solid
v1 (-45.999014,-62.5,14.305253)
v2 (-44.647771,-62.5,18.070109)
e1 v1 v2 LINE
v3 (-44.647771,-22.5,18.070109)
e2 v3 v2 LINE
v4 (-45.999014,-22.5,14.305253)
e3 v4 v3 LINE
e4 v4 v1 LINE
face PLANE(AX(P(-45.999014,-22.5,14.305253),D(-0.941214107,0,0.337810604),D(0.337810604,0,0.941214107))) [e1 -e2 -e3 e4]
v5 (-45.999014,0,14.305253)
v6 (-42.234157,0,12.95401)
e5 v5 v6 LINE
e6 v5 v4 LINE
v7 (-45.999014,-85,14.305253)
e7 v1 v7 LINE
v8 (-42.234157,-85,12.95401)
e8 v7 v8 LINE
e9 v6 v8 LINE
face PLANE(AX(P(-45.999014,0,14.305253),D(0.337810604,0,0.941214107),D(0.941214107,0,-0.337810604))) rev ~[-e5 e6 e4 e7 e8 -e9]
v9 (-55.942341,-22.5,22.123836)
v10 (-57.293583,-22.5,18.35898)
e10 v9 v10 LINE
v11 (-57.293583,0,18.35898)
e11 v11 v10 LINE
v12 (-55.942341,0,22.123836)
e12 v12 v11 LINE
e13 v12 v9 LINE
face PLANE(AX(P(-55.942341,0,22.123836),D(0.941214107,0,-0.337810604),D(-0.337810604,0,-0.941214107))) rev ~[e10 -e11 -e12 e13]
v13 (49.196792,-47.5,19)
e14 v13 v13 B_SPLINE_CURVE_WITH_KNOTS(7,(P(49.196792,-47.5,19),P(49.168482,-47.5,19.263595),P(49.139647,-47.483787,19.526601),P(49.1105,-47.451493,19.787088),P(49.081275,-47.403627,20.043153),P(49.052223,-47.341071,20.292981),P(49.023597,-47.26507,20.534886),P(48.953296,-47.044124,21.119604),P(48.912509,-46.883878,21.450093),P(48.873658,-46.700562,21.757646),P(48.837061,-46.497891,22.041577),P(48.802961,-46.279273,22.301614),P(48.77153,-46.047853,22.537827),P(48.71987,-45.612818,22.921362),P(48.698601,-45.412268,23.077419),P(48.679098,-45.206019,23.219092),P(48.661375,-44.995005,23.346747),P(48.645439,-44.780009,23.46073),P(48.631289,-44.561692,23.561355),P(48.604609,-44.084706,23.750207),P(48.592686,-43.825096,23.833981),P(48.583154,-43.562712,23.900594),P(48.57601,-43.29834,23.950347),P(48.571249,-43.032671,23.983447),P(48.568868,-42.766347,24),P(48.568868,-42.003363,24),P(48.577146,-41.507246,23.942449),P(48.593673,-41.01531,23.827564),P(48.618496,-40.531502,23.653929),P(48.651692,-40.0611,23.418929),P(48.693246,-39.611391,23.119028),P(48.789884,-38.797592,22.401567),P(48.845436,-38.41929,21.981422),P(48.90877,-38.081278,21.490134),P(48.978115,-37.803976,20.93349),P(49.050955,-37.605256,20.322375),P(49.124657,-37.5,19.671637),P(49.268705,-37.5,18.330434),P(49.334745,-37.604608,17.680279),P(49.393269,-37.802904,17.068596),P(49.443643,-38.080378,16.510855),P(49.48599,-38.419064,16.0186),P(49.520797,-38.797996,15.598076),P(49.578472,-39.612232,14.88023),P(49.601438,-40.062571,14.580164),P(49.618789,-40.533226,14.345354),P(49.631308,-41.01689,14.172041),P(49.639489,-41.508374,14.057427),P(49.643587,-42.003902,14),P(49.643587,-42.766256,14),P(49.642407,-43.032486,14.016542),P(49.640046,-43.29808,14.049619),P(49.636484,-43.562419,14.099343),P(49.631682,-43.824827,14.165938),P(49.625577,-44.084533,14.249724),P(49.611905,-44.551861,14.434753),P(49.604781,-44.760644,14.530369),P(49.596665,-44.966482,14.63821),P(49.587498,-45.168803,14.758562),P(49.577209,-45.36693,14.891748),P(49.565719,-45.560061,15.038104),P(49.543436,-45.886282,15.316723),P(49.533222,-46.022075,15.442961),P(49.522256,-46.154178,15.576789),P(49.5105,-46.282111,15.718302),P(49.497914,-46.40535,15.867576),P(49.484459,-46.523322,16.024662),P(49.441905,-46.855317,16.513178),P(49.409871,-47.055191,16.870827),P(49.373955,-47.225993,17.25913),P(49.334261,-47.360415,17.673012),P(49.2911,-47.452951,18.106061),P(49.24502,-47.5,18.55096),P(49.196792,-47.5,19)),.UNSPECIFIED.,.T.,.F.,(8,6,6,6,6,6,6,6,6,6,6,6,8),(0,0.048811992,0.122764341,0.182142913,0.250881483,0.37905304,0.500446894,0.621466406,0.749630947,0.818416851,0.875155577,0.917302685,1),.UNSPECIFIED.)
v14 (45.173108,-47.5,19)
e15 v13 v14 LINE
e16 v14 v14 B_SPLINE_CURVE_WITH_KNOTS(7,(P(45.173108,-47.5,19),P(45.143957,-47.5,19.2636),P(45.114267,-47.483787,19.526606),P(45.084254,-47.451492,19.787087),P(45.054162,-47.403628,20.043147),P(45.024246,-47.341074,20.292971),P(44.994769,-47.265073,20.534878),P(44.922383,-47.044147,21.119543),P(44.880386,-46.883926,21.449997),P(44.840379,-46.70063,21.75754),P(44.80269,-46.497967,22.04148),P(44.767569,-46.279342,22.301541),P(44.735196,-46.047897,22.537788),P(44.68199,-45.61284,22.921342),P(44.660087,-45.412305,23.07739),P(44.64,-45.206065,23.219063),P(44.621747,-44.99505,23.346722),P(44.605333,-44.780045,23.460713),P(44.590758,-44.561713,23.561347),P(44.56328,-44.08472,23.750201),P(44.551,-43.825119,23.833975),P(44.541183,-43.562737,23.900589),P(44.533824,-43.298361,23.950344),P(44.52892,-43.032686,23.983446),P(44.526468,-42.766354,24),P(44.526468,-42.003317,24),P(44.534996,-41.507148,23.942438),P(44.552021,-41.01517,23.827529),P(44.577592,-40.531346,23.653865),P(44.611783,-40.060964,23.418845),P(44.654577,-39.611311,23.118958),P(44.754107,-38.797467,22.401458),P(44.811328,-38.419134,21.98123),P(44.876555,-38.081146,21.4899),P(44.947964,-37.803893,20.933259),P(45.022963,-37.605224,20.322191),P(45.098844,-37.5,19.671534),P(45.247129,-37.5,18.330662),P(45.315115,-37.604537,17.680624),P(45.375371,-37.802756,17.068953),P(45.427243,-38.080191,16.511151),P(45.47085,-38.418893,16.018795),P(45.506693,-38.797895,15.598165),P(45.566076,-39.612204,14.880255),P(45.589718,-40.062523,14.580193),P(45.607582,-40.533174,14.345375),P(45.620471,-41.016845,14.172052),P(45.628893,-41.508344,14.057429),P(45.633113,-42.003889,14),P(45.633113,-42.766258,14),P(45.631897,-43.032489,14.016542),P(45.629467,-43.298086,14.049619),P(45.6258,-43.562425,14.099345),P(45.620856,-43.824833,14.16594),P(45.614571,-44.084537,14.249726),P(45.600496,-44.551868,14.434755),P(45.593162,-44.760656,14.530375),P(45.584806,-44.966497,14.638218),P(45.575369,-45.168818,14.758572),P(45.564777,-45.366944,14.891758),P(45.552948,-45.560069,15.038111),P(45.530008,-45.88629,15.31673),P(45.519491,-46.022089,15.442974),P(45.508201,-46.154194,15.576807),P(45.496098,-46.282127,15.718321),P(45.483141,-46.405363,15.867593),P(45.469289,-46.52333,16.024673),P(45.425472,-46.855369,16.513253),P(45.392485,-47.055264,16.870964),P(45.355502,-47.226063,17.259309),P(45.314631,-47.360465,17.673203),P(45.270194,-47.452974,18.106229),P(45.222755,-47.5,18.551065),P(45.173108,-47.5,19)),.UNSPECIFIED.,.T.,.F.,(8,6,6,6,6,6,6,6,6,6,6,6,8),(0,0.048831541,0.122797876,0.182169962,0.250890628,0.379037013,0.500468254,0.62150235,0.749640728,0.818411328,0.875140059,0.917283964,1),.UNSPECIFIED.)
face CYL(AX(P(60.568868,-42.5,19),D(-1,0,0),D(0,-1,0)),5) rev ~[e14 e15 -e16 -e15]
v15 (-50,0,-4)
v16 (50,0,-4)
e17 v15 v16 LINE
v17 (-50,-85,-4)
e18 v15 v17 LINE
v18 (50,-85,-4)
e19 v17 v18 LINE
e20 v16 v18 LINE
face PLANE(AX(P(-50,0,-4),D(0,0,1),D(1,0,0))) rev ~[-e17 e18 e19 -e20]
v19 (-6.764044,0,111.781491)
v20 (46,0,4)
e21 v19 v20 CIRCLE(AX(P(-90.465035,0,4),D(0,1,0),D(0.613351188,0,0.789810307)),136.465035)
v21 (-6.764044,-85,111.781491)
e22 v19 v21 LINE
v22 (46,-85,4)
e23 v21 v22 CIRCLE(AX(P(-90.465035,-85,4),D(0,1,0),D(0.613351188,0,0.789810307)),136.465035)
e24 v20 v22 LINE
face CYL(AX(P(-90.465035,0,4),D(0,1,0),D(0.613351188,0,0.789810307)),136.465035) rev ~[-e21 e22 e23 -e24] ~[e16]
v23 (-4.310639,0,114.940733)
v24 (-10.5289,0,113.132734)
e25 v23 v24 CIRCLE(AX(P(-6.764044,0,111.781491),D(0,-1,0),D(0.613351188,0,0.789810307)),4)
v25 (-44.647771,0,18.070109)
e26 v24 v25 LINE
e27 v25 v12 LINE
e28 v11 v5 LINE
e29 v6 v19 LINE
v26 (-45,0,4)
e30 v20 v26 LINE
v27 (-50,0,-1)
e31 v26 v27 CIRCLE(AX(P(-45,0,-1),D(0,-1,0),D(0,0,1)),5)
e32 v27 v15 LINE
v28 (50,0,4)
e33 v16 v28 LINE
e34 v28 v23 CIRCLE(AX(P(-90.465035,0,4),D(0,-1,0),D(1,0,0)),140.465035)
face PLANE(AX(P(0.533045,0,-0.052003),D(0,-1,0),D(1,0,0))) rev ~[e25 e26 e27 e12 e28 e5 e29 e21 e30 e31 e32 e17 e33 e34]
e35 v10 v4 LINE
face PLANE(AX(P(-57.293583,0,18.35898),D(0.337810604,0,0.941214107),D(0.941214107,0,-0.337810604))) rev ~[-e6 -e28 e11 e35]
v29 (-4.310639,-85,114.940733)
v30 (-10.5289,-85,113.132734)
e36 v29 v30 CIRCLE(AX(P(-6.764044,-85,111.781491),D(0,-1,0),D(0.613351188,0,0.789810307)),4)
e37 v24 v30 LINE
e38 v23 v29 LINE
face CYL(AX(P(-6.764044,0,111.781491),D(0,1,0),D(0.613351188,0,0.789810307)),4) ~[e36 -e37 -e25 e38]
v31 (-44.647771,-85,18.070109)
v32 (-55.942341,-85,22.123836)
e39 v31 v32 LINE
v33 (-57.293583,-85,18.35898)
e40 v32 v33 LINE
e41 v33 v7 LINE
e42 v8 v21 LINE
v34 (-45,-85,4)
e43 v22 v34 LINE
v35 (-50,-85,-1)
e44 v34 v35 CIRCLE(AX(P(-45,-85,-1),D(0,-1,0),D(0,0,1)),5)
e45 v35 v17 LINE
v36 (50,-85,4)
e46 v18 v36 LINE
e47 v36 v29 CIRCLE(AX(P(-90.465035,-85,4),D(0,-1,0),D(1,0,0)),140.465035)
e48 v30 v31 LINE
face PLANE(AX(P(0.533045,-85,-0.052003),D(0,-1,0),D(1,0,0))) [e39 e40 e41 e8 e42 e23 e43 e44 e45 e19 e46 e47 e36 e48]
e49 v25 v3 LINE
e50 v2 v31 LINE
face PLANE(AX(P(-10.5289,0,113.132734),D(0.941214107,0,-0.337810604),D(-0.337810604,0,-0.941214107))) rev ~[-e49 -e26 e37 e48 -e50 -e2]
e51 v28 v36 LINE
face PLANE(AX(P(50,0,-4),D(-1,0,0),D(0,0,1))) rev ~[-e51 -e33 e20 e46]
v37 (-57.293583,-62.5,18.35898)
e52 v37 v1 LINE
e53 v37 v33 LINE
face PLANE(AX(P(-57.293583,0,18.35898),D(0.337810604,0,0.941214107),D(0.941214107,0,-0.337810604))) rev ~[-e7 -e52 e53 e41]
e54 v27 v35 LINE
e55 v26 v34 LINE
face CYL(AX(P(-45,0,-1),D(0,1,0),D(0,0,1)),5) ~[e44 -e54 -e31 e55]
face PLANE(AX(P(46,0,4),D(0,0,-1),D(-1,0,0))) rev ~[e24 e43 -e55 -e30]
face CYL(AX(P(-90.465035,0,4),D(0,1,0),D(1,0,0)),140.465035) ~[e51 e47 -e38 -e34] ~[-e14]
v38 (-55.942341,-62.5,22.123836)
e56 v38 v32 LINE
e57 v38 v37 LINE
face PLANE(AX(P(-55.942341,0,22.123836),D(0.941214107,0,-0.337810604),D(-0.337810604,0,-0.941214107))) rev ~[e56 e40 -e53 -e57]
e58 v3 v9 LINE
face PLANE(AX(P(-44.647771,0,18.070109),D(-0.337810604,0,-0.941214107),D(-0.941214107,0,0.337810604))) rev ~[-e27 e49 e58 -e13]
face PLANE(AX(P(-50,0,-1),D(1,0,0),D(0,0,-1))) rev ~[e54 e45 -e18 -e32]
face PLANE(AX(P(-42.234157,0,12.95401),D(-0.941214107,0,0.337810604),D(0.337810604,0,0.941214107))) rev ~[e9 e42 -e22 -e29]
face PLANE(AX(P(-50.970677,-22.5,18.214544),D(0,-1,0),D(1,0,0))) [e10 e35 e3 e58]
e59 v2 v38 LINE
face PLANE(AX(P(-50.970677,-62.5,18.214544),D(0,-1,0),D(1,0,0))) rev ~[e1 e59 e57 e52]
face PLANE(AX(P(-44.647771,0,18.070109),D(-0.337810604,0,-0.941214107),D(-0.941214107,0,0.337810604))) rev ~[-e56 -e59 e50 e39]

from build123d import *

# Parameters (mm, degrees)
F1_DEPTH = 85
F2_START = 22.5
F2_DEPTH = 40
F4_D     = 10
F4_DEPTH = 12
F4_START = 1.4311325
F4_TIP   = 3.0043030951


# Not quite as in the source:
# - a feature names something its author has since deleted; it is built from what else it names


with BuildPart() as f1:
    # F0 (on Front) → F1 (new body)
    with BuildSketch(Plane.XZ):
        with BuildLine():
            Line((-50, -4), (50, -4))
            Line((50, -4), (50, 4))
            Line((50, 4), (46, 4))
            Line((46, 4), (-45, 4))
            ThreePointArc((-45, 4), (-48.5355339059, 2.5355339059), (-50, -1))
            Line((-50, -1), (-50, -4))
        make_face()
        with BuildLine():
            Line((-6.7640438608, 111.7814914912), (-4.3106391095, 114.9407327175))
            ThreePointArc((-4.3106391095, 114.9407327175), (-7.8808210545, 115.6224300093), (-10.5289002901, 113.1327339074))
            Line((-10.5289002901, 113.1327339074), (-6.7640438608, 111.7814914912))
        make_face()
        with BuildLine():
            Line((46, 4), (50, 4))
            ThreePointArc((50, 4), (35.6938059368, 65.7606098099), (-4.3106391095, 114.9407327175))
            Line((-4.3106391095, 114.9407327175), (-6.7640438608, 111.7814914912))
            ThreePointArc((-6.7640438608, 111.7814914912), (32.1012011015, 64.0018629557), (46, 4))
        make_face()
        Polygon((-42.2341572851, 12.9540102238), (-6.7640438608, 111.7814914912), (-10.5289002901, 113.1327339074), (-44.6477712982, 18.0701090692), (-45.9990137144, 14.3052526399), align=None)
        Polygon((-45.9990137144, 14.3052526399), (-44.6477712982, 18.0701090692), (-55.9423405859, 22.1238363177), (-57.2935830021, 18.3589798884), align=None)
    extrude(amount=F1_DEPTH)

    # F0 (on Front) → F2 (cut)
    with BuildSketch(Plane.XZ.offset(F2_START)):
        Polygon((-45.9990137144, 14.3052526399), (-44.6477712982, 18.0701090692), (-55.9423405859, 22.1238363177), (-57.2935830021, 18.3589798884), align=None)
    extrude(amount=F2_DEPTH, mode=Mode.SUBTRACT)

    # F4
    # its depths count from where the whole tool has entered the part; down to there all is cleared
    with Locations(Plane.YZ.offset(50).offset(-F4_START)):
        with Locations((-42.5, 19)):
            Hole(F4_D / 2, depth=F4_DEPTH)
            with Locations((0, 0, -(F4_DEPTH + F4_TIP / 2))):  # 118° drill point
                Cone(0, F4_D / 2, F4_TIP, mode=Mode.SUBTRACT)


solid = f1.part
